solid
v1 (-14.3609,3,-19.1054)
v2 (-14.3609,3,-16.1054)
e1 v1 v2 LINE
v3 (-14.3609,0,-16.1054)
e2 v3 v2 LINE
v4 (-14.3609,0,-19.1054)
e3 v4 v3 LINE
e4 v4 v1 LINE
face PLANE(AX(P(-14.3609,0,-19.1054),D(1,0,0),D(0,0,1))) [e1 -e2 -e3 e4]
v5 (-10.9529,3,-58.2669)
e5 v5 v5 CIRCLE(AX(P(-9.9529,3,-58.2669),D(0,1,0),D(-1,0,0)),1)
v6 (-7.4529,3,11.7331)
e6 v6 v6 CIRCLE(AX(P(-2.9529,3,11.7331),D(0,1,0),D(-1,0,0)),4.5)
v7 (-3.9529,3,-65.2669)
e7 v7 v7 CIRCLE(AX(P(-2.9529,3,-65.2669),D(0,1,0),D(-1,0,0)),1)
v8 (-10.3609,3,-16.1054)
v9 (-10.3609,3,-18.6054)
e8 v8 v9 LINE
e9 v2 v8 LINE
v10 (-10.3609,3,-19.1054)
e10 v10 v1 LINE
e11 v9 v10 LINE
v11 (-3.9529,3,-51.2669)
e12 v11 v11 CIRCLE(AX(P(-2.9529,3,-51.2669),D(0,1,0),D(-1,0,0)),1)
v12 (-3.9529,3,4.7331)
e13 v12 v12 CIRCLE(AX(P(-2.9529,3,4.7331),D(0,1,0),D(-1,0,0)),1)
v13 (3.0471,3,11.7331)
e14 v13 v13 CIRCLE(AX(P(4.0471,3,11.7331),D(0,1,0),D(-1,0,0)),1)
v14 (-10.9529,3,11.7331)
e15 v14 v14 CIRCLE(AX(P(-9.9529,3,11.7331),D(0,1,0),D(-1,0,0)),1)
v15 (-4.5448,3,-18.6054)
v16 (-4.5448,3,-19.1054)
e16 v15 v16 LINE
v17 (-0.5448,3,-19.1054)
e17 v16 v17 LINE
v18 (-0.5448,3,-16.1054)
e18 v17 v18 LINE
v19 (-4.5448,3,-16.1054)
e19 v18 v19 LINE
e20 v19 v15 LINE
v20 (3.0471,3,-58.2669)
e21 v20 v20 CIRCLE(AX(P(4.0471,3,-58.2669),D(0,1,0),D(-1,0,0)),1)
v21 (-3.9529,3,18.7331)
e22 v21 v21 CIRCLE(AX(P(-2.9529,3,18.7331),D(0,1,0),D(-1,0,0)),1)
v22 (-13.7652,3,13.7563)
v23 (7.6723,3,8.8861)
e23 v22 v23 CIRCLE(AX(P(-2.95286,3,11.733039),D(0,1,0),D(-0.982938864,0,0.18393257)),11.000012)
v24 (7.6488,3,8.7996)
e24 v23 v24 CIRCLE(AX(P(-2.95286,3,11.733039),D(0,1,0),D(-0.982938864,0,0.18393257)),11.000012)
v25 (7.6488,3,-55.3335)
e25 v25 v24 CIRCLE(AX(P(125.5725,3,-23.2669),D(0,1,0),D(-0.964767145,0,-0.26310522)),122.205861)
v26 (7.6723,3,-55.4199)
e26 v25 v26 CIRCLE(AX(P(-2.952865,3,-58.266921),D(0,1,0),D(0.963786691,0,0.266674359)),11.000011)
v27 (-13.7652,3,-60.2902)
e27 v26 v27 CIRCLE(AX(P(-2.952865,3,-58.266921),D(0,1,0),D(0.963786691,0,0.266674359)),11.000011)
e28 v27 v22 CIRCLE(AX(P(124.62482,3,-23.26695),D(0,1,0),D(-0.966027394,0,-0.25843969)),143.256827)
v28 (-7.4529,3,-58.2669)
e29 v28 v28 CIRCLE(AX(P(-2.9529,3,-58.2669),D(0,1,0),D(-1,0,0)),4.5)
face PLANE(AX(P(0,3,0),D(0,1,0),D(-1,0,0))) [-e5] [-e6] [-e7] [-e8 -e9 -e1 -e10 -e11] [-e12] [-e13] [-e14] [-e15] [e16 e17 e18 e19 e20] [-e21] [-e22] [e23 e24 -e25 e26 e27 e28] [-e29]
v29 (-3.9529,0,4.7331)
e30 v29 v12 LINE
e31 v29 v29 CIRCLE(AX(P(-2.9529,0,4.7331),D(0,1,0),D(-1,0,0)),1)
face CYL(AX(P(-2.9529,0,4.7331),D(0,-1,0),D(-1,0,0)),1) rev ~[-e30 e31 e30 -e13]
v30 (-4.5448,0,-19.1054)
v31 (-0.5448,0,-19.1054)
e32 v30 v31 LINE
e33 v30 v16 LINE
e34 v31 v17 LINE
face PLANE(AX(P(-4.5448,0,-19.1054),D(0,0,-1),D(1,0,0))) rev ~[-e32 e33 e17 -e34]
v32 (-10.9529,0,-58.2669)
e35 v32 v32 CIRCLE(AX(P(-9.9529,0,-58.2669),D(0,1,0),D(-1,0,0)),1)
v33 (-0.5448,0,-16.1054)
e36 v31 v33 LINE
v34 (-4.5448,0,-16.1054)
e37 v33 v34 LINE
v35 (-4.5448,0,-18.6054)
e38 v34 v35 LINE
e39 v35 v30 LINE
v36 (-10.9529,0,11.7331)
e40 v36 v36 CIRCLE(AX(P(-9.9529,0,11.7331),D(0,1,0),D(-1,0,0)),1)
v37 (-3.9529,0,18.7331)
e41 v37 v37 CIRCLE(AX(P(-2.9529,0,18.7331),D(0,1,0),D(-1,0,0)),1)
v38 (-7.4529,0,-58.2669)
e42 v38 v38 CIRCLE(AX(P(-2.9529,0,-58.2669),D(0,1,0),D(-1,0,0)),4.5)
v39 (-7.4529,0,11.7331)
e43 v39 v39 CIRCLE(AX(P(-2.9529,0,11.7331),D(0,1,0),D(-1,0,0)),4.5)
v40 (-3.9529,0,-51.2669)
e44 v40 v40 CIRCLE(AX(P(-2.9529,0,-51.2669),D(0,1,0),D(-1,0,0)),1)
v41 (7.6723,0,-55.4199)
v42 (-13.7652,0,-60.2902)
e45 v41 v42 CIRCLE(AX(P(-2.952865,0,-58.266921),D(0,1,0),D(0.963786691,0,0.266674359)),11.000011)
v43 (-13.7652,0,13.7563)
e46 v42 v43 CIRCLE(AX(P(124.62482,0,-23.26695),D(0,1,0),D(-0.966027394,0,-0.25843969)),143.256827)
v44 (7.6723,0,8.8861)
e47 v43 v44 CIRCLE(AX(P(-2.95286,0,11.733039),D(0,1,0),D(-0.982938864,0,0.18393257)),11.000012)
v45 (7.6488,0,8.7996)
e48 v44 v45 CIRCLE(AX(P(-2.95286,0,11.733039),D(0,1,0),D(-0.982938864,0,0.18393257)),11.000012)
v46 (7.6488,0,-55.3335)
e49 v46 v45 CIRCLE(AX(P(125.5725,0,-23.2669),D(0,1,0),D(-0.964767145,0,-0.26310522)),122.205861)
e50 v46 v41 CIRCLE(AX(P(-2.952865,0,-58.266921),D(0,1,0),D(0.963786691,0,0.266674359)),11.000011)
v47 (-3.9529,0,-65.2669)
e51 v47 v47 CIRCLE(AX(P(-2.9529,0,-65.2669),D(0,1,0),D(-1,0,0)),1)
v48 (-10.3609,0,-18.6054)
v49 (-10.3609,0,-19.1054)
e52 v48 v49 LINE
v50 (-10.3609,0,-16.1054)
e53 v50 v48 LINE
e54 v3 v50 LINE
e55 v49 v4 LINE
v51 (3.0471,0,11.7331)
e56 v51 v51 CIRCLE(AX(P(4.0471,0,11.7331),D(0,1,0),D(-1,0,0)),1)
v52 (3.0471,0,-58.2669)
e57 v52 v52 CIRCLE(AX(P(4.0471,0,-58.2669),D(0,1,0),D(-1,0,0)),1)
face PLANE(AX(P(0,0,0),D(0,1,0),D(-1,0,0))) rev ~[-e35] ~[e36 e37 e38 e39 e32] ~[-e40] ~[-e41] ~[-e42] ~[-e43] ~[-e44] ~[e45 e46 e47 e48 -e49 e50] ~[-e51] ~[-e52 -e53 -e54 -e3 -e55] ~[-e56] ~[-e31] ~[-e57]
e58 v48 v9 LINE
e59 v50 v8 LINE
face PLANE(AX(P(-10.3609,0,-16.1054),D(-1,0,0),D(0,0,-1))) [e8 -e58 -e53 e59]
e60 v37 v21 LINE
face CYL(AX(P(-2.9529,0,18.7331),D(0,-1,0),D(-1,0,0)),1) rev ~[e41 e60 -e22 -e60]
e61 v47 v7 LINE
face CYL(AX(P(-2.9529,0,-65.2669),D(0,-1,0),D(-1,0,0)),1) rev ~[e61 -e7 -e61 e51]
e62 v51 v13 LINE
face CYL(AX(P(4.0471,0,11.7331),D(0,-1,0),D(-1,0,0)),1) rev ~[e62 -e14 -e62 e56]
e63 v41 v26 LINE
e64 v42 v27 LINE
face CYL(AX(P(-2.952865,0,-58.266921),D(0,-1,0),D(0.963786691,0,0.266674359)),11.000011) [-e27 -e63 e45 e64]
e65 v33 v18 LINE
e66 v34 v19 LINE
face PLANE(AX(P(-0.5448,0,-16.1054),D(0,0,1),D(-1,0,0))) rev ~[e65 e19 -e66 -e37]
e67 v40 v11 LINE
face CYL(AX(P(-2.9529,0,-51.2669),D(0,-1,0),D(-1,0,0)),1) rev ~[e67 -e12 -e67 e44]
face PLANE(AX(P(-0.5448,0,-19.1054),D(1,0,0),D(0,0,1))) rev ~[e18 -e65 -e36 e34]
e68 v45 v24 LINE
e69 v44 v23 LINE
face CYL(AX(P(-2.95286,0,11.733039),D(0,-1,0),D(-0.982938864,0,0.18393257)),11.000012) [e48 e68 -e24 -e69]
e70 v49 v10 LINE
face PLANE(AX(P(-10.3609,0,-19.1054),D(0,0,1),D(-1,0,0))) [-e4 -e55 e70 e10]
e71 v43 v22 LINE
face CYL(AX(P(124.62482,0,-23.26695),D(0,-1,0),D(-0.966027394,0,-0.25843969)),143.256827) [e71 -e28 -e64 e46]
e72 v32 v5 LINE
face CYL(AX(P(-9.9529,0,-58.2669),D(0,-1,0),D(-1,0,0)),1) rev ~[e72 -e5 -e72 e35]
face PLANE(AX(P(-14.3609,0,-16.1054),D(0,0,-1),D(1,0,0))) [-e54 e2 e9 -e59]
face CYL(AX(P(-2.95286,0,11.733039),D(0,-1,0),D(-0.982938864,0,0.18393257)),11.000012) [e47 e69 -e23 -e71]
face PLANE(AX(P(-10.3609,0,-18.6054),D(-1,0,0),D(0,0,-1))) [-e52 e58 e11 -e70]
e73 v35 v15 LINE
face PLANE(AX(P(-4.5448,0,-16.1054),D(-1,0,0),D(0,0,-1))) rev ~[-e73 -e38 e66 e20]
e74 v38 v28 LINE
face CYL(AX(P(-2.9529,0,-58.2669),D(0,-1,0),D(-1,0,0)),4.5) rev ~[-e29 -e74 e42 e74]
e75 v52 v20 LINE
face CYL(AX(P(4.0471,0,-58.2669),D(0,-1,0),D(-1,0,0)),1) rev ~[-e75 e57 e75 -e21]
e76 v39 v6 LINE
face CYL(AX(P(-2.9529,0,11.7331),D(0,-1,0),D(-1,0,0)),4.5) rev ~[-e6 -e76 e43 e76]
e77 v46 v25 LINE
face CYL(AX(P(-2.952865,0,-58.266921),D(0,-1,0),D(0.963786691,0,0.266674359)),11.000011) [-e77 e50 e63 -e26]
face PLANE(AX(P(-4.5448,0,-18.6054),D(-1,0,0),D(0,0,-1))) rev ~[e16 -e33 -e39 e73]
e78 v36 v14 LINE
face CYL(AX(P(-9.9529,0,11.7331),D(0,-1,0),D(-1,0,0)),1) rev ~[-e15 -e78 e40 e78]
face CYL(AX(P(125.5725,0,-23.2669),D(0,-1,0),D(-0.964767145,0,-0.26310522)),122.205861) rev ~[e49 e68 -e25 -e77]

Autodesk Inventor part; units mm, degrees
ref_plane "YZ Plane" through (0, 0, 0) normal (1, 0, 0) x (0, 1, 0)
ref_plane "XZ Plane" through (0, 0, 0) normal (0, 1, 0) x (-1, 0, 0)
ref_plane "XY Plane" through (0, 0, 0) normal (0, 0, 1) x (1, 0, 0)
sketch "Sketch1" plane through (0, 0, 0) normal (0, 1, 0) x (-1, 0, 0)
  arc A0 (13.7652, 13.7563) -> (-7.6488, 8.7996) centre (2.9529, 11.7331) ccw
  arc A1 (-7.6488, -55.3335) -> (13.7652, -60.2902) centre (2.9529, -58.2669) ccw
  arc A2 (-7.6723, -55.4199) -> (-7.6723, 8.8861) centre (-125.5725, -23.2669) ccw
  circle A3 centre (2.9529, 11.7331) radius 4.5
  circle A4 centre (2.9529, -58.2669) radius 4.5
  circle A5 centre (2.9529, 4.7331) radius 1
  circle A6 centre (9.9529, 11.7331) radius 1
  circle A7 centre (2.9529, 18.7331) radius 1
  circle A8 centre (-4.0471, 11.7331) radius 1
  circle A9 centre (2.9529, -65.2669) radius 1
  circle A10 centre (9.9529, -58.2669) radius 1
  circle A11 centre (2.9529, -51.2669) radius 1
  circle A12 centre (-4.0471, -58.2669) radius 1
  line L0 (14.3609, -16.1054) -> (10.3609, -16.1054)
  line L1 (10.3609, -16.1054) -> (10.3609, -19.1054)
  line L2 (10.3609, -19.1054) -> (14.3609, -19.1054)
  line L3 (14.3609, -19.1054) -> (14.3609, -16.1054)
  line L4 (14.3609, -11.7669) -> (10.3609, -14.7669) construction
  line L5 (10.3609, -11.7669) -> (14.3609, -14.7669) construction
  line L6 (0.5448, -16.1054) -> (4.5448, -16.1054)
  line L7 (4.5448, -16.1054) -> (4.5448, -19.1054)
  line L8 (4.5448, -19.1054) -> (0.5448, -19.1054)
  line L9 (0.5448, -19.1054) -> (0.5448, -16.1054)
  arc A13 (13.7652, -60.2902) -> (13.7652, 13.7563) centre (-124.6252, -23.2669) ccw
  line L10 (12.3609, -13.2669) -> (12.3609, -13.2669)
  line L11 (10.3609, -18.6054) -> (4.5448, -18.6054)
  line L12 (7.4529, -18.6054) -> (7.4529, -17.6054)
  point P0 (0, 0)
  dimension "d0" = 22
  dimension "d1" = 22
  dimension "d2" = 70
  dimension "d3" = 9
  dimension "d4" = 9
  dimension "d6" = 2
  dimension "d9" = 360
  dimension "d13" = 2
  dimension "d16" = 360
  dimension "d21" = 4
  dimension "d22" = 3
  dimension "d26" = 5.8161
  dimension "d27" = 13.8161
  dimension "d28" = 0
  dimension "d30" = 1
extrude "Extrusion1" add sketch "Sketch1" along normal blind 3
sketch "Sketch2" plane through (0, 3, 0) normal (0, 1, 0) x (1, 0, 0)
  point P0 (0, 0)
sketch "Sketch3" plane through (0, 3, 0) normal (0, 1, 0) x (1, 0, 0)
  point P0 (0, 0)
properties part number "fem"
